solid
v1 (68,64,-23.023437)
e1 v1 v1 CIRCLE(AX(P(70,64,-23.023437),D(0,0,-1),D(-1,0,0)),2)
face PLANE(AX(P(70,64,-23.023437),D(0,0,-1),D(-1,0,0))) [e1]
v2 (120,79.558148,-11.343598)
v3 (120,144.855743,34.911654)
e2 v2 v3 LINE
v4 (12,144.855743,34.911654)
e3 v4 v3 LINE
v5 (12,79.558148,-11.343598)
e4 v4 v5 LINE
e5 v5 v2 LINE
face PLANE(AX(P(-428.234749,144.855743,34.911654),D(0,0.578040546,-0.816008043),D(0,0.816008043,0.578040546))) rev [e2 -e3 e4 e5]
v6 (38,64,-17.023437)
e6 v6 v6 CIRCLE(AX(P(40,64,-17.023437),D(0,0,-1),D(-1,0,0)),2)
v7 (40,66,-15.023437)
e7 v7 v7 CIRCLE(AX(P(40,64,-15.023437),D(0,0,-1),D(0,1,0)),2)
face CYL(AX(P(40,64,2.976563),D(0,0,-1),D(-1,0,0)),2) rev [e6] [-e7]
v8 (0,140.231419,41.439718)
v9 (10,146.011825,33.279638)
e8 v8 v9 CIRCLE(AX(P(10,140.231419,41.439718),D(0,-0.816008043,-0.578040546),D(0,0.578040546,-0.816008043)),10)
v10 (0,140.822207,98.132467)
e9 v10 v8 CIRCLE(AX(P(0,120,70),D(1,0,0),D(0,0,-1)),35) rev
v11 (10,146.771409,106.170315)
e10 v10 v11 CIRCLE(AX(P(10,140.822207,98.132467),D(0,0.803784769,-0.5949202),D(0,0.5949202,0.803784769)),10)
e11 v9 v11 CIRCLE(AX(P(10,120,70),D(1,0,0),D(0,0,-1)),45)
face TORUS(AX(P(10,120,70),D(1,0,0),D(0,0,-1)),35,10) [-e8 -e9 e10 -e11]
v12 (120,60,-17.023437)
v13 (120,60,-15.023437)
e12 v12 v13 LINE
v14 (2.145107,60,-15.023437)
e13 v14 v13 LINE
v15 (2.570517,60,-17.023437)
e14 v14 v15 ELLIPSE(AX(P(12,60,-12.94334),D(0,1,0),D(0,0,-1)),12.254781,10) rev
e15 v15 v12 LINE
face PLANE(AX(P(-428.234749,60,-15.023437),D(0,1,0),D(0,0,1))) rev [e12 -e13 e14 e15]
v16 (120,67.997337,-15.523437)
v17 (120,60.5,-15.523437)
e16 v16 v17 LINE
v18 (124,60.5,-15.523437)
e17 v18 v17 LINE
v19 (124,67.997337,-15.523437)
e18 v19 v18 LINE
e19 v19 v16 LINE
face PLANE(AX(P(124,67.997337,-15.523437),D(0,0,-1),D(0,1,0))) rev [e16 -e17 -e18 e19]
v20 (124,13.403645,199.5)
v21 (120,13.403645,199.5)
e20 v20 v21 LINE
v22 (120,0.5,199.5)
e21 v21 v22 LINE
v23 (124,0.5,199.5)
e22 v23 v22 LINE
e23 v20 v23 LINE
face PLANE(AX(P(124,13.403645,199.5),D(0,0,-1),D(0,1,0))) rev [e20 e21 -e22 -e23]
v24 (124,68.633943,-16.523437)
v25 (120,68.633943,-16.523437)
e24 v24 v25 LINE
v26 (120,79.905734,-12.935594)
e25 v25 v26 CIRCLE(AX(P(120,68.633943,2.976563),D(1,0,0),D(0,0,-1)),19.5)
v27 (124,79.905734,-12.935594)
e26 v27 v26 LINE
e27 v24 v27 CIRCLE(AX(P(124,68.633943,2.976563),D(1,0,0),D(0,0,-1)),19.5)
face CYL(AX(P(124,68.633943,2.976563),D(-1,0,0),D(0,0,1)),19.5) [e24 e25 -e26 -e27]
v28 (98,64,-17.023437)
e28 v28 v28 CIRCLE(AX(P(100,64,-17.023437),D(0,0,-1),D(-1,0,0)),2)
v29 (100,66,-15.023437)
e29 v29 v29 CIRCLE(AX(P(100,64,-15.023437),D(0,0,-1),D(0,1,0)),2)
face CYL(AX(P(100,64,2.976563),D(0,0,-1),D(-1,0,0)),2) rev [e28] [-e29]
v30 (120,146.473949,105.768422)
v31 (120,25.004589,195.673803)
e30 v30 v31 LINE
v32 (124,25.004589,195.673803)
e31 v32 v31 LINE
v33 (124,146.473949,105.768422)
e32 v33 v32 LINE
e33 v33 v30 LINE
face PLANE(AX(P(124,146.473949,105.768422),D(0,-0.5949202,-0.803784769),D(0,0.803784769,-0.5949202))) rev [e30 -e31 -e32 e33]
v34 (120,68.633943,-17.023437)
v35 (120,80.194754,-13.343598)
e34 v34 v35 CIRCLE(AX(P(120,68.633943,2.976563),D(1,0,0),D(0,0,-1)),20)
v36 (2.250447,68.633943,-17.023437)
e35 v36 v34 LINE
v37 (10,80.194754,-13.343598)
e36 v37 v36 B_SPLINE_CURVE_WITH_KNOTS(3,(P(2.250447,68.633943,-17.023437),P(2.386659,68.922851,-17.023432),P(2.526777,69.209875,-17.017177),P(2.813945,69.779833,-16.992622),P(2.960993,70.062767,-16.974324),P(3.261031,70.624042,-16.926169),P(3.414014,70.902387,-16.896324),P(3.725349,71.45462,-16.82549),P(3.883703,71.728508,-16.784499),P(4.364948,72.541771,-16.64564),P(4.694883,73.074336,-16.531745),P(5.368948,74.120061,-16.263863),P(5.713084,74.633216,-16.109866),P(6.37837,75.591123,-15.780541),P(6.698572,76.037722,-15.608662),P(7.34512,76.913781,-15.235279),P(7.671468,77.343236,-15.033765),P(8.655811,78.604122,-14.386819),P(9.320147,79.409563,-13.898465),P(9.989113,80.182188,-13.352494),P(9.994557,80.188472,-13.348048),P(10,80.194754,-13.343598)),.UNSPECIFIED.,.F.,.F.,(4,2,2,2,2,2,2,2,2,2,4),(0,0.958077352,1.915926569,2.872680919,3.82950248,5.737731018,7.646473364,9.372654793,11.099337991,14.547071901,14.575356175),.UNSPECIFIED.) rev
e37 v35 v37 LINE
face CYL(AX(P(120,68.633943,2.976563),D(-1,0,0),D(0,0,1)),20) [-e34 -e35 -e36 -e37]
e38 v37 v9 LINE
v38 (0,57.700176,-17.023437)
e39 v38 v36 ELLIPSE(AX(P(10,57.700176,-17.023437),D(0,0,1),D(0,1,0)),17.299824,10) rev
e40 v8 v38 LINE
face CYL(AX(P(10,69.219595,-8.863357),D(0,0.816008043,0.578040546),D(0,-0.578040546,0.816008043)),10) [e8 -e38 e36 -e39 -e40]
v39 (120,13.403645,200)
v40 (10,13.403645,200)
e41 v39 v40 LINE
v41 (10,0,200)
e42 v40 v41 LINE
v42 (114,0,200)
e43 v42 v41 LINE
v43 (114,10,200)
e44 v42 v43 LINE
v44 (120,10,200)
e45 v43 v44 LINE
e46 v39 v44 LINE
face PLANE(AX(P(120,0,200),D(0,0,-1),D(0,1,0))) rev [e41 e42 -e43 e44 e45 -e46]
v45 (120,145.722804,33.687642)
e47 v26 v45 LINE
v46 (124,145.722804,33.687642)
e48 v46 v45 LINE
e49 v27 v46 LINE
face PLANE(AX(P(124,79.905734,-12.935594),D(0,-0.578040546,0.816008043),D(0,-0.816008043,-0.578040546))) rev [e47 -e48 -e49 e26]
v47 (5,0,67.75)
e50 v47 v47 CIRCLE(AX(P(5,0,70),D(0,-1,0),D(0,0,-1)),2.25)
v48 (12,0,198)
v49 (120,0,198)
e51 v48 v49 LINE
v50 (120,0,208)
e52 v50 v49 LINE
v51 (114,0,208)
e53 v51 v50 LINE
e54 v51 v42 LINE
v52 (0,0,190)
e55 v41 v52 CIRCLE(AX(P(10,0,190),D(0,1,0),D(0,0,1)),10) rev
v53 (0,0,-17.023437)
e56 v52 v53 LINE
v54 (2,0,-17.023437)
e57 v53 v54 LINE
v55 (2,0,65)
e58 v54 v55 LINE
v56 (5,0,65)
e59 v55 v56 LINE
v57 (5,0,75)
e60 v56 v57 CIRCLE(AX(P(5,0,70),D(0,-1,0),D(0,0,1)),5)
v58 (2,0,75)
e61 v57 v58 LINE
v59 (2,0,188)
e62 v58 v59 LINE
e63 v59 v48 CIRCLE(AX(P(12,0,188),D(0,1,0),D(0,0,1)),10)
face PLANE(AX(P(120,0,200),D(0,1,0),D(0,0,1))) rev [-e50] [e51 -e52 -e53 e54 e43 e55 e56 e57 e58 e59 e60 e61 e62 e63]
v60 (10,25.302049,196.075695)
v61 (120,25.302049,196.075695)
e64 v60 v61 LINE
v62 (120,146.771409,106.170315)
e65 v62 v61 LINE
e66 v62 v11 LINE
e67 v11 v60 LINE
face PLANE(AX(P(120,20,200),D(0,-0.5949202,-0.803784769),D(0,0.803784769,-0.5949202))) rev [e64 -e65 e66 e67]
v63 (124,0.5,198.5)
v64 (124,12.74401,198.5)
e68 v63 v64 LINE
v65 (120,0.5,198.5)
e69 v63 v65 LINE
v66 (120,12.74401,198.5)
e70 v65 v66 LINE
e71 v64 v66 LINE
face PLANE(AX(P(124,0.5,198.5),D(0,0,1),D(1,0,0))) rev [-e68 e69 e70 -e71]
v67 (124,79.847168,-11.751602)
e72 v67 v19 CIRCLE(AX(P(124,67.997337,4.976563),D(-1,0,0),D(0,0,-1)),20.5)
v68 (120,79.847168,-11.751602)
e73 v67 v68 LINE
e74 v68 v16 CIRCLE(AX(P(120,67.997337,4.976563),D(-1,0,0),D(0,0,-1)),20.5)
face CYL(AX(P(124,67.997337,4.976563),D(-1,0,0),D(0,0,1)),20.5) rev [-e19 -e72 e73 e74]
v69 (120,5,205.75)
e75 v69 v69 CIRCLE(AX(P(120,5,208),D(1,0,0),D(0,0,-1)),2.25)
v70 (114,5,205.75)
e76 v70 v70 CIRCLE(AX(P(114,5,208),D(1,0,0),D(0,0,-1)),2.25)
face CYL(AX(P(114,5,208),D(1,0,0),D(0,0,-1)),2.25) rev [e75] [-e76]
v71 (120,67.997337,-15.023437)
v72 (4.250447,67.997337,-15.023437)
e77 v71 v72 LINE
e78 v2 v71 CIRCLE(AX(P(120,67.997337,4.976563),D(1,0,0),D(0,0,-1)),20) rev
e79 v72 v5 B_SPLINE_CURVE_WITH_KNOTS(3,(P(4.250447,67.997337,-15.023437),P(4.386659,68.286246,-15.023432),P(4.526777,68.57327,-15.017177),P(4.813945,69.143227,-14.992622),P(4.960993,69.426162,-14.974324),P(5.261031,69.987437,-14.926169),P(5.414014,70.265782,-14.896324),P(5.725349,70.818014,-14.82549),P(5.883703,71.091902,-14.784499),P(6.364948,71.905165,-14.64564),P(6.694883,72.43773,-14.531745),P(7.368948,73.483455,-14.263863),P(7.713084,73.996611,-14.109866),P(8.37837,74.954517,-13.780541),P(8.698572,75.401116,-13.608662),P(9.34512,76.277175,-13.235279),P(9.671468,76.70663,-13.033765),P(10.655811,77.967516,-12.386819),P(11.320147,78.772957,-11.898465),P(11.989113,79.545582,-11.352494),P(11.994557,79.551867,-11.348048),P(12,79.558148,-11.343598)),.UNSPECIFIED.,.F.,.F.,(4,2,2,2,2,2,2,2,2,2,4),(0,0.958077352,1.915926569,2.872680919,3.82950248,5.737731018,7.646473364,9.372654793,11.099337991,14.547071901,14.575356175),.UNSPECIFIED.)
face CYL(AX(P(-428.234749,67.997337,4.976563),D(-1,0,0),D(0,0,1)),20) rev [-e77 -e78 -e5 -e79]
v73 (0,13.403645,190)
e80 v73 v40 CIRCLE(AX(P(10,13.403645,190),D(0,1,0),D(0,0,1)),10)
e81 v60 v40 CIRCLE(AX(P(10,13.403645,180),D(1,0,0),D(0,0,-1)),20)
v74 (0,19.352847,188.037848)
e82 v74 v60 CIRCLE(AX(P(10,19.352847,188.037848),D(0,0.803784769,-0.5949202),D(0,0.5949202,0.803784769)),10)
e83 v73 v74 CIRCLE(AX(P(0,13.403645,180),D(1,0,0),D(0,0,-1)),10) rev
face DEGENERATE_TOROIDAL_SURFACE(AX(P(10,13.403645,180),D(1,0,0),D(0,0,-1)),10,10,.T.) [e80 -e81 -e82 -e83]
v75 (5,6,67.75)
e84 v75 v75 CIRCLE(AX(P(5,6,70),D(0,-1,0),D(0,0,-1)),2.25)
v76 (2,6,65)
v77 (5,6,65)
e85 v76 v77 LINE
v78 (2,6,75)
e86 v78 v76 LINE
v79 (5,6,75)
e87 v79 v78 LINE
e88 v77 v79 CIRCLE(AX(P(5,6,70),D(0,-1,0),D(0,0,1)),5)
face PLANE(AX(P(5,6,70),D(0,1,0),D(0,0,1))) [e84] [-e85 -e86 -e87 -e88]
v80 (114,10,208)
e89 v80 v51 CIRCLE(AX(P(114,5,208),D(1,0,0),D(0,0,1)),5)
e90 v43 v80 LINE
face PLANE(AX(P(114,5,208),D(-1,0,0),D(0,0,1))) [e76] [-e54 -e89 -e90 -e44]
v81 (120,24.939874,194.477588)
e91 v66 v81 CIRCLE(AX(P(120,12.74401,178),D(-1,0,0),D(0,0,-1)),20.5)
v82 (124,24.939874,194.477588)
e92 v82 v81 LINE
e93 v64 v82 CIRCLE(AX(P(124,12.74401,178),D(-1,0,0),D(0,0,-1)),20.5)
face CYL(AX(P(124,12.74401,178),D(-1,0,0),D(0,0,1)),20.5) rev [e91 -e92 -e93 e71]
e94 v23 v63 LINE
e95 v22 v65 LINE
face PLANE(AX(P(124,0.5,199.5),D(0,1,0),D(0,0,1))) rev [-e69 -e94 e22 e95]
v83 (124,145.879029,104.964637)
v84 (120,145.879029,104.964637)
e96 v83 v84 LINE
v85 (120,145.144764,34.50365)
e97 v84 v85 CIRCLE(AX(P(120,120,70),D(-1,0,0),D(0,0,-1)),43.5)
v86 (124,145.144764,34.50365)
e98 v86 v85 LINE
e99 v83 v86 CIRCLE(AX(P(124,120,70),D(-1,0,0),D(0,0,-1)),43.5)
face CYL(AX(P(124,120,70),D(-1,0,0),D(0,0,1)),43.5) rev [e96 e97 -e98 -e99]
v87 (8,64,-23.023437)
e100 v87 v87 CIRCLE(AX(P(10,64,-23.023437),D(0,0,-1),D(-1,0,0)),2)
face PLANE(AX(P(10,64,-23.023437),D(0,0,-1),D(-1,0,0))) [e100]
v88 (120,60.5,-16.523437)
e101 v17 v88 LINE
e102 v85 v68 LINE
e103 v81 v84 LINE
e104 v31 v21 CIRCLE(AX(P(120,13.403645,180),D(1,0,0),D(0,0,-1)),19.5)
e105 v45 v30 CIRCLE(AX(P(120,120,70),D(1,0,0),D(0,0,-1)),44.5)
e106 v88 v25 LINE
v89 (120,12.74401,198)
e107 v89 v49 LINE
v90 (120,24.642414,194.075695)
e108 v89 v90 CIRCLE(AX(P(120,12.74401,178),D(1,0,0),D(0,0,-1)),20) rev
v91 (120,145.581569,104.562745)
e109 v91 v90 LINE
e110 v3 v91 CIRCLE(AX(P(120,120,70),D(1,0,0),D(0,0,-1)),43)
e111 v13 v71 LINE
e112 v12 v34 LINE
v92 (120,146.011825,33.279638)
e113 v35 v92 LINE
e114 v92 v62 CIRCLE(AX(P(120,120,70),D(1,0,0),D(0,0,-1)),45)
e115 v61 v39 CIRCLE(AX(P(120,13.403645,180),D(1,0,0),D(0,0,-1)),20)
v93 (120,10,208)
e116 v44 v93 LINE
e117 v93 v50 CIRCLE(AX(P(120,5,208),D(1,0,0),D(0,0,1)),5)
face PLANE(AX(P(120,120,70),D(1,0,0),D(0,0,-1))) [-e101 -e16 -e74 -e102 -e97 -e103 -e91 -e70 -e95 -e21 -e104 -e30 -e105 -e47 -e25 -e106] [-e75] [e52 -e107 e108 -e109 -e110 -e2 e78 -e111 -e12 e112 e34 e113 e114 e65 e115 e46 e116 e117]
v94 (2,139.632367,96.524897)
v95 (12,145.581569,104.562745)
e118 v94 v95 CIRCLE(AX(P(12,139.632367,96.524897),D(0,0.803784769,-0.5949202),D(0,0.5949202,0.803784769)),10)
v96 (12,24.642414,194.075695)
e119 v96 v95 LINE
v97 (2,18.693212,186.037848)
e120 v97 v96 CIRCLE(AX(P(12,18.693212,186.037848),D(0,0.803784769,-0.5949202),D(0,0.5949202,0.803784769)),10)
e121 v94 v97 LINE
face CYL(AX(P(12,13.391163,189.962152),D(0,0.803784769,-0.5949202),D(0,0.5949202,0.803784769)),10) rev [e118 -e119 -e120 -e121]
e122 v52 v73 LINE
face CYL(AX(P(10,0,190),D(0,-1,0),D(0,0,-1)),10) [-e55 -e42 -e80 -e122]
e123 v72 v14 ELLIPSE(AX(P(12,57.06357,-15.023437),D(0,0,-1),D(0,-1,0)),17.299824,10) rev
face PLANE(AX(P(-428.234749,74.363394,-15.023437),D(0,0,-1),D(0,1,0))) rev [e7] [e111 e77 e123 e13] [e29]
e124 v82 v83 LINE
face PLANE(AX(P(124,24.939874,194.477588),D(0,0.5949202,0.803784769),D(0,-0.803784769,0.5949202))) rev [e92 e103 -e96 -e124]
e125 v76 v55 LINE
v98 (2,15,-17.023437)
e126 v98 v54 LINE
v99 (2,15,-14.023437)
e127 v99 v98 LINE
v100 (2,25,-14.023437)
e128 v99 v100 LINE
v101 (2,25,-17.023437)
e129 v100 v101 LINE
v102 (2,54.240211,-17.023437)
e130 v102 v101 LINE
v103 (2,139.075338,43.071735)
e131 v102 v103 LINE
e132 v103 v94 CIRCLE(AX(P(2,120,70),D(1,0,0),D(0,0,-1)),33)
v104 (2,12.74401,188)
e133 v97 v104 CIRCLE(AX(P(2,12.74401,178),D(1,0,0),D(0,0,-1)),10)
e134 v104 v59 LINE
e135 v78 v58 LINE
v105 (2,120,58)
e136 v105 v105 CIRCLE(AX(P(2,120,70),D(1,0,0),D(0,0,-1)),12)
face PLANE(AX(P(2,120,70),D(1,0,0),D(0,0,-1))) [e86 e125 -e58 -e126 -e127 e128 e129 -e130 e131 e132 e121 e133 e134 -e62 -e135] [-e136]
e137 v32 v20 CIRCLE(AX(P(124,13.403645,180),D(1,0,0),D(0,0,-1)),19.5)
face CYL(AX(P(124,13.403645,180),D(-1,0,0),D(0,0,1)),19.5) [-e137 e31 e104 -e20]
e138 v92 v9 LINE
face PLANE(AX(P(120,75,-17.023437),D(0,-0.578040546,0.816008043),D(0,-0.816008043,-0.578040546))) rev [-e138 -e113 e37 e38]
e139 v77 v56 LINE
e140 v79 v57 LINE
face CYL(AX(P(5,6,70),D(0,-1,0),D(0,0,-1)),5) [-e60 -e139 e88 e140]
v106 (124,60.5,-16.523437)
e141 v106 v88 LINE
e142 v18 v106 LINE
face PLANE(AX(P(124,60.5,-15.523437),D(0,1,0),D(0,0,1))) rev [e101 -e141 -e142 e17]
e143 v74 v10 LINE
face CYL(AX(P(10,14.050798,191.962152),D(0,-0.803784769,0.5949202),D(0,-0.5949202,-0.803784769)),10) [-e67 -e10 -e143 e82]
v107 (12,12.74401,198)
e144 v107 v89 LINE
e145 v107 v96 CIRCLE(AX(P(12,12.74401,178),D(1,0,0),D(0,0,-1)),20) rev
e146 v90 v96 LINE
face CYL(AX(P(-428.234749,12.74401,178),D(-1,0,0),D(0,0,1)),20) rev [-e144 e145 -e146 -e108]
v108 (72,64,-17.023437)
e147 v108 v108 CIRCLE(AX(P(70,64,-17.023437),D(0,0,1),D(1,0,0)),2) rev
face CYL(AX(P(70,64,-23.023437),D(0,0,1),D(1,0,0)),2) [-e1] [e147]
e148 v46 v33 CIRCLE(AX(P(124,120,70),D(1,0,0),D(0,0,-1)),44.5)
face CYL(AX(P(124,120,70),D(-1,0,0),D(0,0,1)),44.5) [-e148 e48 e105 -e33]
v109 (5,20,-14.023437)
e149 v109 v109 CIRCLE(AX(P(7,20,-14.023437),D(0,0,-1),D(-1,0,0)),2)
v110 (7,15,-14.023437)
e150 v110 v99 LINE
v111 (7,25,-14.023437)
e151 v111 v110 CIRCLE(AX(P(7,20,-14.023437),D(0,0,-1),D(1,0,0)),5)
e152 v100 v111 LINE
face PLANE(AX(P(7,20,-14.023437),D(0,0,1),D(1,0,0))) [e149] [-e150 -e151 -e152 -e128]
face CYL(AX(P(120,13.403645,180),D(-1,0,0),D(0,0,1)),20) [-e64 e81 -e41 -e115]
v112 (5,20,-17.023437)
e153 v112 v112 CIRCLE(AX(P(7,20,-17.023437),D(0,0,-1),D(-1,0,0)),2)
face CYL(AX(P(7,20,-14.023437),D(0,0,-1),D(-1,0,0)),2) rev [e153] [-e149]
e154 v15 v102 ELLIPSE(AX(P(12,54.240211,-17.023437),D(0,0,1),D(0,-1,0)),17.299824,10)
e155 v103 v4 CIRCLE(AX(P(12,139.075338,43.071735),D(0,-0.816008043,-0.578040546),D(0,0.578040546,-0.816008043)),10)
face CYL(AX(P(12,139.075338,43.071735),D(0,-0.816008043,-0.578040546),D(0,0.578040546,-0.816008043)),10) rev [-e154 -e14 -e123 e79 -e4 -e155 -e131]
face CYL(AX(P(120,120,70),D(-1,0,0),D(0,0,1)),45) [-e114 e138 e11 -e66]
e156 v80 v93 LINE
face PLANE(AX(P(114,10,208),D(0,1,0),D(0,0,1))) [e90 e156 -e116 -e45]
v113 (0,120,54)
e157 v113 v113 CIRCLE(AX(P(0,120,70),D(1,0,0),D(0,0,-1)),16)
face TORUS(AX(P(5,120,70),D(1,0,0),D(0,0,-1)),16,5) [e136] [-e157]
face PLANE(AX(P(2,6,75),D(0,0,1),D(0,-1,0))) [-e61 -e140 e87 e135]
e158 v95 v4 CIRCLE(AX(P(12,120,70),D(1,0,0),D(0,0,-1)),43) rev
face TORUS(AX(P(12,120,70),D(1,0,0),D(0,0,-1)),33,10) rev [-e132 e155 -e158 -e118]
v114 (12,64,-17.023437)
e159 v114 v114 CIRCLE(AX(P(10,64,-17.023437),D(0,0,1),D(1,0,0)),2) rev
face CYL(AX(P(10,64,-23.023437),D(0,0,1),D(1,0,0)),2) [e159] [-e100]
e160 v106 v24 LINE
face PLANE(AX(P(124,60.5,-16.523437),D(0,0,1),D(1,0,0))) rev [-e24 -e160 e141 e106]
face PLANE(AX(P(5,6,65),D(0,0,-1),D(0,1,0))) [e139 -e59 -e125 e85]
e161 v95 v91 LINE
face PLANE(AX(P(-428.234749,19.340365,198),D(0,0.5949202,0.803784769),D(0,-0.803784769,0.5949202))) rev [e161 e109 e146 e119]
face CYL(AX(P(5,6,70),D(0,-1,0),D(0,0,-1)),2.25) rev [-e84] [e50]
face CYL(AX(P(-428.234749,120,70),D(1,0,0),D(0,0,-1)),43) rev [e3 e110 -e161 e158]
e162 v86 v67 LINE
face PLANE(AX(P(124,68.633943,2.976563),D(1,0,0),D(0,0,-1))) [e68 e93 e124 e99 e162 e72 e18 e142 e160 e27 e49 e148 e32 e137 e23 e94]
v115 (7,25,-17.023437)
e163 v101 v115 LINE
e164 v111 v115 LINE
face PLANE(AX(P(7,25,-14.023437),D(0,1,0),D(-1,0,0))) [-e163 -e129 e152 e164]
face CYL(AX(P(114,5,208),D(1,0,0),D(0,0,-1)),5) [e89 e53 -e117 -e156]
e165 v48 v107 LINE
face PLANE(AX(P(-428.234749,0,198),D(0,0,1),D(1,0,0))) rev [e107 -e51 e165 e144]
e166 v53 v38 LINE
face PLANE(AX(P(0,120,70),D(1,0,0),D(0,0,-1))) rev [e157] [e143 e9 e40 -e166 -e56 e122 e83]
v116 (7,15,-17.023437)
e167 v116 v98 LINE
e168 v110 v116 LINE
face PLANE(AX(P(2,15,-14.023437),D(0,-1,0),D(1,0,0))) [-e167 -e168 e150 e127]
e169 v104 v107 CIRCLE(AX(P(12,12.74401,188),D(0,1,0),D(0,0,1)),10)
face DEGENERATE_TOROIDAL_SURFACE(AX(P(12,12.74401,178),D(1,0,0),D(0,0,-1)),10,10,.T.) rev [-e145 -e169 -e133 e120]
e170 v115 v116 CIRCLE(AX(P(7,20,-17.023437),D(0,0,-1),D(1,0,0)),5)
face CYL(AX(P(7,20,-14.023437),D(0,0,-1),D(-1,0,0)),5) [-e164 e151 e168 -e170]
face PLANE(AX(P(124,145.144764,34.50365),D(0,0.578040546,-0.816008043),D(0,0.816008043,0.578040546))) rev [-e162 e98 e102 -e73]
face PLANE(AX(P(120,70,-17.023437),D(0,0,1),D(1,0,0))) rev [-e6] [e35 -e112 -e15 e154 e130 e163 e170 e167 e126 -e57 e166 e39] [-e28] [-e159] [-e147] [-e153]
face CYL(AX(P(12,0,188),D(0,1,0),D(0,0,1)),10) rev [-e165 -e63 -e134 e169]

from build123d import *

# Parameters (mm, degrees)
CROQUIS1_R              = 12
SALIENTE_EXTRUIR1_DEPTH = 120
CORTAR_EXTRUIR1_DEPTH   = 118
REDONDEO1_R             = 20
CROQUIS3_W              = 250
CROQUIS3_H              = 250
CORTAR_EXTRUIR2_DEPTH   = 298.866030678
CROQUIS4_R              = 2
CORTAR_EXTRUIR3_DEPTH   = 20
CROQUIS5_R              = 2
SALIENTE_EXTRUIR2_DEPTH = 6
REDONDEO2_R             = 10
REDONDEO4_START         = 2.145107019
REDONDEO4_DEPTH         = 118.854892981
REDONDEO4_START_2       = 4.250447227
REDONDEO4_2_DEPTH       = 115.749552773
SALIENTE_EXTRUIR3_DEPTH = 4
CROQUIS7_R              = 2.25
SALIENTE_EXTRUIR4_DEPTH = 6
CROQUIS9_R              = 2.25
SALIENTE_EXTRUIR5_DEPTH = 6
CROQUIS10_R             = 2
SALIENTE_EXTRUIR6_DEPTH = 3
REDONDEO5_R             = 5


with BuildPart() as part:
    # Croquis1 → Saliente-Extruir1 (new body)
    with BuildSketch(Plane(origin=(0, 0, 0), x_dir=(0, 0, -1), z_dir=(1, 0, 0))):
        with BuildLine():
            Line((-200, 0), (200, 0))
            Line((200, 0), (200, 45))
            Line((200, 45), (175, 70))
            Line((175, 70), (17.023437057, 70))
            Line((17.023437057, 70), (17.023437057, 75))
            Line((17.023437057, 75), (-33.279638053, 146.01182459))
            ThreePointArc((-33.279638053, 146.01182459), (-69.531086216, 164.997556821), (-106.170314621, 146.771409007))
            Line((-106.170314621, 146.771409007), (-200, 20))
            Line((-200, 20), (-200, 0))
        make_face()
        with Locations((-70, 120)):
            Circle(CROQUIS1_R, mode=Mode.SUBTRACT)
    extrude(amount=SALIENTE_EXTRUIR1_DEPTH)

    # Croquis2 → Cortar-Extruir1 (cut)
    with BuildSketch(Plane(origin=(120, 0, 0), x_dir=(0, 0, -1), z_dir=(1, 0, 0))):
        with BuildLine():
            Line((35.023437057, 60), (35.023437057, 68))
            Line((35.023437057, 68), (174.171572875, 68))
            Line((174.171572875, 68), (198, 44.171572875))
            Line((198, 44.171572875), (198, 0))
            Line((198, 0), (-198, 0))
            Line((-198, 0), (-198, 19.340364538))
            Line((-198, 19.340364538), (-104.562745082, 145.581568607))
            ThreePointArc((-104.562745082, 145.581568607), (-69.551926829, 162.997665407), (-34.91165414, 144.855743497))
            Line((-34.91165414, 144.855743497), (15.023437057, 74.363394288))
            Line((15.023437057, 74.363394288), (15.023437057, 60))
            Line((15.023437057, 60), (35.023437057, 60))
        make_face()
    extrude(amount=-CORTAR_EXTRUIR1_DEPTH, mode=Mode.SUBTRACT)

    # Redondeo1
    redondeo1_edges = [part.edges().sort_by_distance(p)[0] for p in [
        (60, 20, 200),
        (60, 70, -175),
        (60, 45, -200),
        (61, 19.340364538, 198),
        (61, 68, -174.171572875),
        (61, 44.171572875, -198),
    ]]
    fillet(redondeo1_edges, radius=REDONDEO1_R)

    # Croquis3 → Cortar-Extruir2 (cut, through all)
    with BuildSketch(Plane(origin=(0, 0, -17.023437057), x_dir=(-1, 0, 0), z_dir=(0, 0, -1))):
        with Locations((-60, 64.142135624)):
            Rectangle(CROQUIS3_W, CROQUIS3_H)
    extrude(amount=CORTAR_EXTRUIR2_DEPTH, mode=Mode.SUBTRACT)

    # Croquis4 → Cortar-Extruir3 (cut)
    with BuildSketch(Plane(origin=(0, 0, -17.023437057), x_dir=(-1, 0, 0), z_dir=(0, 0, -1))):
        with Locations((-100, 64)):
            Circle(CROQUIS4_R)
        with Locations((-40, 64)):
            Circle(CROQUIS4_R)
    extrude(amount=-CORTAR_EXTRUIR3_DEPTH, mode=Mode.SUBTRACT)

    # Croquis5 → Saliente-Extruir2 (add)
    with BuildSketch(Plane(origin=(0, 0, -17.023437057), x_dir=(-1, 0, 0), z_dir=(0, 0, -1))):
        with Locations(Location((-70, 64, 0), (0, 0, 180))):
            Circle(CROQUIS5_R)
        with Locations(Location((-10, 64, 0), (0, 0, 180))):
            Circle(CROQUIS5_R)
    extrude(amount=SALIENTE_EXTRUIR2_DEPTH)

    # Redondeo2
    redondeo2_edges = [part.edges().sort_by_distance(p)[0] for p in [
        (0, 110.505912295, 8.128100498),
        (0, 6.701822688, 200),
        (0, 19.668072416, 198.993602972),
        (0, 86.036729193, 151.123005004),
        (0, 164.997556821, 69.531086216),
        (2, 6.372004957, 198),
        (2, 19.008436953, 196.993602972),
        (2, 109.609568893, 9.944108542),
        (2, 162.997665407, 69.551926829),
        (2, 85.111991262, 149.319220235),
    ]]
    fillet(redondeo2_edges, radius=REDONDEO2_R)

    # Redondeo4: read off the stored shape, not the designer's step
    # Redondeo4 outline → Redondeo4 (cut)
    with BuildSketch(Plane.YZ.offset(REDONDEO4_START)):
        with BuildLine():
            Line((75, -17.023437057), (80.194753812, -13.343597922))
            ThreePointArc((80.194753812, -13.343597922), (74.700110648, -16.081286061), (68.633942883, -17.023437057))
            Line((68.633942883, -17.023437057), (75, -17.023437057))
        make_face()
    extrude(amount=REDONDEO4_DEPTH, mode=Mode.SUBTRACT)

    # Redondeo4 2 outline → Redondeo4 2 (add)
    with BuildSketch(Plane.YZ.offset(REDONDEO4_START_2)):
        with BuildLine():
            Line((74.363394288, -15.023437057), (79.5581481, -11.343597922))
            ThreePointArc((79.5581481, -11.343597922), (74.063504936, -14.081286061), (67.997337171, -15.023437057))
            Line((67.997337171, -15.023437057), (74.363394288, -15.023437057))
        make_face()
    extrude(amount=REDONDEO4_2_DEPTH)

    # Croquis6 → Saliente-Extruir3 (add)
    with BuildSketch(Plane(origin=(120, 0, 0), x_dir=(0, 0, -1), z_dir=(1, 0, 0))):
        with BuildLine():
            Line((16.523437057, 60.5), (16.523437057, 68.633942883))
            ThreePointArc((16.523437057, 68.633942883), (15.604839835, 74.548456453), (12.9355939, 79.905733538))
            Line((12.9355939, 79.905733538), (-33.687642075, 145.722804317))
            ThreePointArc((-33.687642075, 145.722804317), (-69.536296369, 164.497583967), (-105.768422236, 146.473948907))
            Line((-105.768422236, 146.473948907), (-195.673803002, 25.00458928))
            ThreePointArc((-195.673803002, 25.00458928), (-198.518762898, 19.51146174), (-199.5, 13.403645376))
            Line((-199.5, 13.403645376), (-199.5, 0.5))
            Line((-199.5, 0.5), (-198.5, 0.5))
            Line((-198.5, 0.5), (-198.5, 12.744009914))
            ThreePointArc((-198.5, 12.744009914), (-197.468443047, 19.165047629), (-194.477587772, 24.939874017))
            Line((-194.477587772, 24.939874017), (-104.964637467, 145.879028707))
            ThreePointArc((-104.964637467, 145.879028707), (-69.546716676, 163.49763826), (-34.503650118, 145.144763771))
            Line((-34.503650118, 145.144763771), (11.751601944, 79.847168373))
            ThreePointArc((11.751601944, 79.847168373), (14.557732286, 74.21515913), (15.523437057, 67.997337171))
            Line((15.523437057, 67.997337171), (15.523437057, 60.5))
            Line((15.523437057, 60.5), (16.523437057, 60.5))
        make_face()
    extrude(amount=SALIENTE_EXTRUIR3_DEPTH)

    # Croquis7 → Saliente-Extruir4 (add)
    with BuildSketch(Plane.XZ):
        with BuildLine():
            Line((2, 75), (5, 75))
            ThreePointArc((5, 75), (10, 70), (5, 65))
            Line((5, 65), (2, 65))
            Line((2, 65), (2, 75))
        make_face()
        with Locations(Location((5, 70, 0), (0, 0, 270))):
            Circle(CROQUIS7_R, mode=Mode.SUBTRACT)
    extrude(amount=-SALIENTE_EXTRUIR4_DEPTH)

    # Croquis9 → Saliente-Extruir5 (add)
    with BuildSketch(Plane(origin=(120, 0, 0), x_dir=(0, 0, -1), z_dir=(1, 0, 0))):
        with BuildLine():
            Line((-200, 0), (-208, 0))
            ThreePointArc((-208, 0), (-213, 5), (-208, 10))
            Line((-208, 10), (-200, 10))
            Line((-200, 10), (-200, 0))
        make_face()
        with Locations((-208, 5)):
            Circle(CROQUIS9_R, mode=Mode.SUBTRACT)
    extrude(amount=-SALIENTE_EXTRUIR5_DEPTH)

    # Croquis10 → Saliente-Extruir6 (add)
    with BuildSketch(Plane(origin=(0, 0, -17.023437057), x_dir=(-1, 0, 0), z_dir=(0, 0, -1))):
        with BuildLine():
            Line((-2, 15), (-7, 15))
            ThreePointArc((-7, 15), (-12, 20), (-7, 25))
            Line((-7, 25), (-2, 25))
            Line((-2, 25), (-2, 15))
        make_face()
        with Locations((-7, 20)):
            Circle(CROQUIS10_R, mode=Mode.SUBTRACT)
    extrude(amount=-SALIENTE_EXTRUIR6_DEPTH)

    # Redondeo5
    # the kernel refuses this fillet: 5 mm, written as the material it takes off along each edge
    with BuildSketch(Plane(origin=(0, 120, 70), x_dir=(0, 0, -1), z_dir=(0, -1, 0))) as redondeo5_piece_1:
        with BuildLine():
            CenterArc((16, 5), REDONDEO5_R, 216.869897646, 53.130102354)
            Line((12, 2), (11.92, 1.94))
            ThreePointArc((11.92, 1.94), (11.9, 1), (11.9, 0))
            Line((11.9, 0), (12, -0.1))
            Line((12, -0.1), (16, -0.1))
            Line((16, -0.1), (16, 0))
        make_face()
    revolve(axis=Axis((0, 120, 70), (1, 0, 0)), mode=Mode.SUBTRACT)


solid = part.part
